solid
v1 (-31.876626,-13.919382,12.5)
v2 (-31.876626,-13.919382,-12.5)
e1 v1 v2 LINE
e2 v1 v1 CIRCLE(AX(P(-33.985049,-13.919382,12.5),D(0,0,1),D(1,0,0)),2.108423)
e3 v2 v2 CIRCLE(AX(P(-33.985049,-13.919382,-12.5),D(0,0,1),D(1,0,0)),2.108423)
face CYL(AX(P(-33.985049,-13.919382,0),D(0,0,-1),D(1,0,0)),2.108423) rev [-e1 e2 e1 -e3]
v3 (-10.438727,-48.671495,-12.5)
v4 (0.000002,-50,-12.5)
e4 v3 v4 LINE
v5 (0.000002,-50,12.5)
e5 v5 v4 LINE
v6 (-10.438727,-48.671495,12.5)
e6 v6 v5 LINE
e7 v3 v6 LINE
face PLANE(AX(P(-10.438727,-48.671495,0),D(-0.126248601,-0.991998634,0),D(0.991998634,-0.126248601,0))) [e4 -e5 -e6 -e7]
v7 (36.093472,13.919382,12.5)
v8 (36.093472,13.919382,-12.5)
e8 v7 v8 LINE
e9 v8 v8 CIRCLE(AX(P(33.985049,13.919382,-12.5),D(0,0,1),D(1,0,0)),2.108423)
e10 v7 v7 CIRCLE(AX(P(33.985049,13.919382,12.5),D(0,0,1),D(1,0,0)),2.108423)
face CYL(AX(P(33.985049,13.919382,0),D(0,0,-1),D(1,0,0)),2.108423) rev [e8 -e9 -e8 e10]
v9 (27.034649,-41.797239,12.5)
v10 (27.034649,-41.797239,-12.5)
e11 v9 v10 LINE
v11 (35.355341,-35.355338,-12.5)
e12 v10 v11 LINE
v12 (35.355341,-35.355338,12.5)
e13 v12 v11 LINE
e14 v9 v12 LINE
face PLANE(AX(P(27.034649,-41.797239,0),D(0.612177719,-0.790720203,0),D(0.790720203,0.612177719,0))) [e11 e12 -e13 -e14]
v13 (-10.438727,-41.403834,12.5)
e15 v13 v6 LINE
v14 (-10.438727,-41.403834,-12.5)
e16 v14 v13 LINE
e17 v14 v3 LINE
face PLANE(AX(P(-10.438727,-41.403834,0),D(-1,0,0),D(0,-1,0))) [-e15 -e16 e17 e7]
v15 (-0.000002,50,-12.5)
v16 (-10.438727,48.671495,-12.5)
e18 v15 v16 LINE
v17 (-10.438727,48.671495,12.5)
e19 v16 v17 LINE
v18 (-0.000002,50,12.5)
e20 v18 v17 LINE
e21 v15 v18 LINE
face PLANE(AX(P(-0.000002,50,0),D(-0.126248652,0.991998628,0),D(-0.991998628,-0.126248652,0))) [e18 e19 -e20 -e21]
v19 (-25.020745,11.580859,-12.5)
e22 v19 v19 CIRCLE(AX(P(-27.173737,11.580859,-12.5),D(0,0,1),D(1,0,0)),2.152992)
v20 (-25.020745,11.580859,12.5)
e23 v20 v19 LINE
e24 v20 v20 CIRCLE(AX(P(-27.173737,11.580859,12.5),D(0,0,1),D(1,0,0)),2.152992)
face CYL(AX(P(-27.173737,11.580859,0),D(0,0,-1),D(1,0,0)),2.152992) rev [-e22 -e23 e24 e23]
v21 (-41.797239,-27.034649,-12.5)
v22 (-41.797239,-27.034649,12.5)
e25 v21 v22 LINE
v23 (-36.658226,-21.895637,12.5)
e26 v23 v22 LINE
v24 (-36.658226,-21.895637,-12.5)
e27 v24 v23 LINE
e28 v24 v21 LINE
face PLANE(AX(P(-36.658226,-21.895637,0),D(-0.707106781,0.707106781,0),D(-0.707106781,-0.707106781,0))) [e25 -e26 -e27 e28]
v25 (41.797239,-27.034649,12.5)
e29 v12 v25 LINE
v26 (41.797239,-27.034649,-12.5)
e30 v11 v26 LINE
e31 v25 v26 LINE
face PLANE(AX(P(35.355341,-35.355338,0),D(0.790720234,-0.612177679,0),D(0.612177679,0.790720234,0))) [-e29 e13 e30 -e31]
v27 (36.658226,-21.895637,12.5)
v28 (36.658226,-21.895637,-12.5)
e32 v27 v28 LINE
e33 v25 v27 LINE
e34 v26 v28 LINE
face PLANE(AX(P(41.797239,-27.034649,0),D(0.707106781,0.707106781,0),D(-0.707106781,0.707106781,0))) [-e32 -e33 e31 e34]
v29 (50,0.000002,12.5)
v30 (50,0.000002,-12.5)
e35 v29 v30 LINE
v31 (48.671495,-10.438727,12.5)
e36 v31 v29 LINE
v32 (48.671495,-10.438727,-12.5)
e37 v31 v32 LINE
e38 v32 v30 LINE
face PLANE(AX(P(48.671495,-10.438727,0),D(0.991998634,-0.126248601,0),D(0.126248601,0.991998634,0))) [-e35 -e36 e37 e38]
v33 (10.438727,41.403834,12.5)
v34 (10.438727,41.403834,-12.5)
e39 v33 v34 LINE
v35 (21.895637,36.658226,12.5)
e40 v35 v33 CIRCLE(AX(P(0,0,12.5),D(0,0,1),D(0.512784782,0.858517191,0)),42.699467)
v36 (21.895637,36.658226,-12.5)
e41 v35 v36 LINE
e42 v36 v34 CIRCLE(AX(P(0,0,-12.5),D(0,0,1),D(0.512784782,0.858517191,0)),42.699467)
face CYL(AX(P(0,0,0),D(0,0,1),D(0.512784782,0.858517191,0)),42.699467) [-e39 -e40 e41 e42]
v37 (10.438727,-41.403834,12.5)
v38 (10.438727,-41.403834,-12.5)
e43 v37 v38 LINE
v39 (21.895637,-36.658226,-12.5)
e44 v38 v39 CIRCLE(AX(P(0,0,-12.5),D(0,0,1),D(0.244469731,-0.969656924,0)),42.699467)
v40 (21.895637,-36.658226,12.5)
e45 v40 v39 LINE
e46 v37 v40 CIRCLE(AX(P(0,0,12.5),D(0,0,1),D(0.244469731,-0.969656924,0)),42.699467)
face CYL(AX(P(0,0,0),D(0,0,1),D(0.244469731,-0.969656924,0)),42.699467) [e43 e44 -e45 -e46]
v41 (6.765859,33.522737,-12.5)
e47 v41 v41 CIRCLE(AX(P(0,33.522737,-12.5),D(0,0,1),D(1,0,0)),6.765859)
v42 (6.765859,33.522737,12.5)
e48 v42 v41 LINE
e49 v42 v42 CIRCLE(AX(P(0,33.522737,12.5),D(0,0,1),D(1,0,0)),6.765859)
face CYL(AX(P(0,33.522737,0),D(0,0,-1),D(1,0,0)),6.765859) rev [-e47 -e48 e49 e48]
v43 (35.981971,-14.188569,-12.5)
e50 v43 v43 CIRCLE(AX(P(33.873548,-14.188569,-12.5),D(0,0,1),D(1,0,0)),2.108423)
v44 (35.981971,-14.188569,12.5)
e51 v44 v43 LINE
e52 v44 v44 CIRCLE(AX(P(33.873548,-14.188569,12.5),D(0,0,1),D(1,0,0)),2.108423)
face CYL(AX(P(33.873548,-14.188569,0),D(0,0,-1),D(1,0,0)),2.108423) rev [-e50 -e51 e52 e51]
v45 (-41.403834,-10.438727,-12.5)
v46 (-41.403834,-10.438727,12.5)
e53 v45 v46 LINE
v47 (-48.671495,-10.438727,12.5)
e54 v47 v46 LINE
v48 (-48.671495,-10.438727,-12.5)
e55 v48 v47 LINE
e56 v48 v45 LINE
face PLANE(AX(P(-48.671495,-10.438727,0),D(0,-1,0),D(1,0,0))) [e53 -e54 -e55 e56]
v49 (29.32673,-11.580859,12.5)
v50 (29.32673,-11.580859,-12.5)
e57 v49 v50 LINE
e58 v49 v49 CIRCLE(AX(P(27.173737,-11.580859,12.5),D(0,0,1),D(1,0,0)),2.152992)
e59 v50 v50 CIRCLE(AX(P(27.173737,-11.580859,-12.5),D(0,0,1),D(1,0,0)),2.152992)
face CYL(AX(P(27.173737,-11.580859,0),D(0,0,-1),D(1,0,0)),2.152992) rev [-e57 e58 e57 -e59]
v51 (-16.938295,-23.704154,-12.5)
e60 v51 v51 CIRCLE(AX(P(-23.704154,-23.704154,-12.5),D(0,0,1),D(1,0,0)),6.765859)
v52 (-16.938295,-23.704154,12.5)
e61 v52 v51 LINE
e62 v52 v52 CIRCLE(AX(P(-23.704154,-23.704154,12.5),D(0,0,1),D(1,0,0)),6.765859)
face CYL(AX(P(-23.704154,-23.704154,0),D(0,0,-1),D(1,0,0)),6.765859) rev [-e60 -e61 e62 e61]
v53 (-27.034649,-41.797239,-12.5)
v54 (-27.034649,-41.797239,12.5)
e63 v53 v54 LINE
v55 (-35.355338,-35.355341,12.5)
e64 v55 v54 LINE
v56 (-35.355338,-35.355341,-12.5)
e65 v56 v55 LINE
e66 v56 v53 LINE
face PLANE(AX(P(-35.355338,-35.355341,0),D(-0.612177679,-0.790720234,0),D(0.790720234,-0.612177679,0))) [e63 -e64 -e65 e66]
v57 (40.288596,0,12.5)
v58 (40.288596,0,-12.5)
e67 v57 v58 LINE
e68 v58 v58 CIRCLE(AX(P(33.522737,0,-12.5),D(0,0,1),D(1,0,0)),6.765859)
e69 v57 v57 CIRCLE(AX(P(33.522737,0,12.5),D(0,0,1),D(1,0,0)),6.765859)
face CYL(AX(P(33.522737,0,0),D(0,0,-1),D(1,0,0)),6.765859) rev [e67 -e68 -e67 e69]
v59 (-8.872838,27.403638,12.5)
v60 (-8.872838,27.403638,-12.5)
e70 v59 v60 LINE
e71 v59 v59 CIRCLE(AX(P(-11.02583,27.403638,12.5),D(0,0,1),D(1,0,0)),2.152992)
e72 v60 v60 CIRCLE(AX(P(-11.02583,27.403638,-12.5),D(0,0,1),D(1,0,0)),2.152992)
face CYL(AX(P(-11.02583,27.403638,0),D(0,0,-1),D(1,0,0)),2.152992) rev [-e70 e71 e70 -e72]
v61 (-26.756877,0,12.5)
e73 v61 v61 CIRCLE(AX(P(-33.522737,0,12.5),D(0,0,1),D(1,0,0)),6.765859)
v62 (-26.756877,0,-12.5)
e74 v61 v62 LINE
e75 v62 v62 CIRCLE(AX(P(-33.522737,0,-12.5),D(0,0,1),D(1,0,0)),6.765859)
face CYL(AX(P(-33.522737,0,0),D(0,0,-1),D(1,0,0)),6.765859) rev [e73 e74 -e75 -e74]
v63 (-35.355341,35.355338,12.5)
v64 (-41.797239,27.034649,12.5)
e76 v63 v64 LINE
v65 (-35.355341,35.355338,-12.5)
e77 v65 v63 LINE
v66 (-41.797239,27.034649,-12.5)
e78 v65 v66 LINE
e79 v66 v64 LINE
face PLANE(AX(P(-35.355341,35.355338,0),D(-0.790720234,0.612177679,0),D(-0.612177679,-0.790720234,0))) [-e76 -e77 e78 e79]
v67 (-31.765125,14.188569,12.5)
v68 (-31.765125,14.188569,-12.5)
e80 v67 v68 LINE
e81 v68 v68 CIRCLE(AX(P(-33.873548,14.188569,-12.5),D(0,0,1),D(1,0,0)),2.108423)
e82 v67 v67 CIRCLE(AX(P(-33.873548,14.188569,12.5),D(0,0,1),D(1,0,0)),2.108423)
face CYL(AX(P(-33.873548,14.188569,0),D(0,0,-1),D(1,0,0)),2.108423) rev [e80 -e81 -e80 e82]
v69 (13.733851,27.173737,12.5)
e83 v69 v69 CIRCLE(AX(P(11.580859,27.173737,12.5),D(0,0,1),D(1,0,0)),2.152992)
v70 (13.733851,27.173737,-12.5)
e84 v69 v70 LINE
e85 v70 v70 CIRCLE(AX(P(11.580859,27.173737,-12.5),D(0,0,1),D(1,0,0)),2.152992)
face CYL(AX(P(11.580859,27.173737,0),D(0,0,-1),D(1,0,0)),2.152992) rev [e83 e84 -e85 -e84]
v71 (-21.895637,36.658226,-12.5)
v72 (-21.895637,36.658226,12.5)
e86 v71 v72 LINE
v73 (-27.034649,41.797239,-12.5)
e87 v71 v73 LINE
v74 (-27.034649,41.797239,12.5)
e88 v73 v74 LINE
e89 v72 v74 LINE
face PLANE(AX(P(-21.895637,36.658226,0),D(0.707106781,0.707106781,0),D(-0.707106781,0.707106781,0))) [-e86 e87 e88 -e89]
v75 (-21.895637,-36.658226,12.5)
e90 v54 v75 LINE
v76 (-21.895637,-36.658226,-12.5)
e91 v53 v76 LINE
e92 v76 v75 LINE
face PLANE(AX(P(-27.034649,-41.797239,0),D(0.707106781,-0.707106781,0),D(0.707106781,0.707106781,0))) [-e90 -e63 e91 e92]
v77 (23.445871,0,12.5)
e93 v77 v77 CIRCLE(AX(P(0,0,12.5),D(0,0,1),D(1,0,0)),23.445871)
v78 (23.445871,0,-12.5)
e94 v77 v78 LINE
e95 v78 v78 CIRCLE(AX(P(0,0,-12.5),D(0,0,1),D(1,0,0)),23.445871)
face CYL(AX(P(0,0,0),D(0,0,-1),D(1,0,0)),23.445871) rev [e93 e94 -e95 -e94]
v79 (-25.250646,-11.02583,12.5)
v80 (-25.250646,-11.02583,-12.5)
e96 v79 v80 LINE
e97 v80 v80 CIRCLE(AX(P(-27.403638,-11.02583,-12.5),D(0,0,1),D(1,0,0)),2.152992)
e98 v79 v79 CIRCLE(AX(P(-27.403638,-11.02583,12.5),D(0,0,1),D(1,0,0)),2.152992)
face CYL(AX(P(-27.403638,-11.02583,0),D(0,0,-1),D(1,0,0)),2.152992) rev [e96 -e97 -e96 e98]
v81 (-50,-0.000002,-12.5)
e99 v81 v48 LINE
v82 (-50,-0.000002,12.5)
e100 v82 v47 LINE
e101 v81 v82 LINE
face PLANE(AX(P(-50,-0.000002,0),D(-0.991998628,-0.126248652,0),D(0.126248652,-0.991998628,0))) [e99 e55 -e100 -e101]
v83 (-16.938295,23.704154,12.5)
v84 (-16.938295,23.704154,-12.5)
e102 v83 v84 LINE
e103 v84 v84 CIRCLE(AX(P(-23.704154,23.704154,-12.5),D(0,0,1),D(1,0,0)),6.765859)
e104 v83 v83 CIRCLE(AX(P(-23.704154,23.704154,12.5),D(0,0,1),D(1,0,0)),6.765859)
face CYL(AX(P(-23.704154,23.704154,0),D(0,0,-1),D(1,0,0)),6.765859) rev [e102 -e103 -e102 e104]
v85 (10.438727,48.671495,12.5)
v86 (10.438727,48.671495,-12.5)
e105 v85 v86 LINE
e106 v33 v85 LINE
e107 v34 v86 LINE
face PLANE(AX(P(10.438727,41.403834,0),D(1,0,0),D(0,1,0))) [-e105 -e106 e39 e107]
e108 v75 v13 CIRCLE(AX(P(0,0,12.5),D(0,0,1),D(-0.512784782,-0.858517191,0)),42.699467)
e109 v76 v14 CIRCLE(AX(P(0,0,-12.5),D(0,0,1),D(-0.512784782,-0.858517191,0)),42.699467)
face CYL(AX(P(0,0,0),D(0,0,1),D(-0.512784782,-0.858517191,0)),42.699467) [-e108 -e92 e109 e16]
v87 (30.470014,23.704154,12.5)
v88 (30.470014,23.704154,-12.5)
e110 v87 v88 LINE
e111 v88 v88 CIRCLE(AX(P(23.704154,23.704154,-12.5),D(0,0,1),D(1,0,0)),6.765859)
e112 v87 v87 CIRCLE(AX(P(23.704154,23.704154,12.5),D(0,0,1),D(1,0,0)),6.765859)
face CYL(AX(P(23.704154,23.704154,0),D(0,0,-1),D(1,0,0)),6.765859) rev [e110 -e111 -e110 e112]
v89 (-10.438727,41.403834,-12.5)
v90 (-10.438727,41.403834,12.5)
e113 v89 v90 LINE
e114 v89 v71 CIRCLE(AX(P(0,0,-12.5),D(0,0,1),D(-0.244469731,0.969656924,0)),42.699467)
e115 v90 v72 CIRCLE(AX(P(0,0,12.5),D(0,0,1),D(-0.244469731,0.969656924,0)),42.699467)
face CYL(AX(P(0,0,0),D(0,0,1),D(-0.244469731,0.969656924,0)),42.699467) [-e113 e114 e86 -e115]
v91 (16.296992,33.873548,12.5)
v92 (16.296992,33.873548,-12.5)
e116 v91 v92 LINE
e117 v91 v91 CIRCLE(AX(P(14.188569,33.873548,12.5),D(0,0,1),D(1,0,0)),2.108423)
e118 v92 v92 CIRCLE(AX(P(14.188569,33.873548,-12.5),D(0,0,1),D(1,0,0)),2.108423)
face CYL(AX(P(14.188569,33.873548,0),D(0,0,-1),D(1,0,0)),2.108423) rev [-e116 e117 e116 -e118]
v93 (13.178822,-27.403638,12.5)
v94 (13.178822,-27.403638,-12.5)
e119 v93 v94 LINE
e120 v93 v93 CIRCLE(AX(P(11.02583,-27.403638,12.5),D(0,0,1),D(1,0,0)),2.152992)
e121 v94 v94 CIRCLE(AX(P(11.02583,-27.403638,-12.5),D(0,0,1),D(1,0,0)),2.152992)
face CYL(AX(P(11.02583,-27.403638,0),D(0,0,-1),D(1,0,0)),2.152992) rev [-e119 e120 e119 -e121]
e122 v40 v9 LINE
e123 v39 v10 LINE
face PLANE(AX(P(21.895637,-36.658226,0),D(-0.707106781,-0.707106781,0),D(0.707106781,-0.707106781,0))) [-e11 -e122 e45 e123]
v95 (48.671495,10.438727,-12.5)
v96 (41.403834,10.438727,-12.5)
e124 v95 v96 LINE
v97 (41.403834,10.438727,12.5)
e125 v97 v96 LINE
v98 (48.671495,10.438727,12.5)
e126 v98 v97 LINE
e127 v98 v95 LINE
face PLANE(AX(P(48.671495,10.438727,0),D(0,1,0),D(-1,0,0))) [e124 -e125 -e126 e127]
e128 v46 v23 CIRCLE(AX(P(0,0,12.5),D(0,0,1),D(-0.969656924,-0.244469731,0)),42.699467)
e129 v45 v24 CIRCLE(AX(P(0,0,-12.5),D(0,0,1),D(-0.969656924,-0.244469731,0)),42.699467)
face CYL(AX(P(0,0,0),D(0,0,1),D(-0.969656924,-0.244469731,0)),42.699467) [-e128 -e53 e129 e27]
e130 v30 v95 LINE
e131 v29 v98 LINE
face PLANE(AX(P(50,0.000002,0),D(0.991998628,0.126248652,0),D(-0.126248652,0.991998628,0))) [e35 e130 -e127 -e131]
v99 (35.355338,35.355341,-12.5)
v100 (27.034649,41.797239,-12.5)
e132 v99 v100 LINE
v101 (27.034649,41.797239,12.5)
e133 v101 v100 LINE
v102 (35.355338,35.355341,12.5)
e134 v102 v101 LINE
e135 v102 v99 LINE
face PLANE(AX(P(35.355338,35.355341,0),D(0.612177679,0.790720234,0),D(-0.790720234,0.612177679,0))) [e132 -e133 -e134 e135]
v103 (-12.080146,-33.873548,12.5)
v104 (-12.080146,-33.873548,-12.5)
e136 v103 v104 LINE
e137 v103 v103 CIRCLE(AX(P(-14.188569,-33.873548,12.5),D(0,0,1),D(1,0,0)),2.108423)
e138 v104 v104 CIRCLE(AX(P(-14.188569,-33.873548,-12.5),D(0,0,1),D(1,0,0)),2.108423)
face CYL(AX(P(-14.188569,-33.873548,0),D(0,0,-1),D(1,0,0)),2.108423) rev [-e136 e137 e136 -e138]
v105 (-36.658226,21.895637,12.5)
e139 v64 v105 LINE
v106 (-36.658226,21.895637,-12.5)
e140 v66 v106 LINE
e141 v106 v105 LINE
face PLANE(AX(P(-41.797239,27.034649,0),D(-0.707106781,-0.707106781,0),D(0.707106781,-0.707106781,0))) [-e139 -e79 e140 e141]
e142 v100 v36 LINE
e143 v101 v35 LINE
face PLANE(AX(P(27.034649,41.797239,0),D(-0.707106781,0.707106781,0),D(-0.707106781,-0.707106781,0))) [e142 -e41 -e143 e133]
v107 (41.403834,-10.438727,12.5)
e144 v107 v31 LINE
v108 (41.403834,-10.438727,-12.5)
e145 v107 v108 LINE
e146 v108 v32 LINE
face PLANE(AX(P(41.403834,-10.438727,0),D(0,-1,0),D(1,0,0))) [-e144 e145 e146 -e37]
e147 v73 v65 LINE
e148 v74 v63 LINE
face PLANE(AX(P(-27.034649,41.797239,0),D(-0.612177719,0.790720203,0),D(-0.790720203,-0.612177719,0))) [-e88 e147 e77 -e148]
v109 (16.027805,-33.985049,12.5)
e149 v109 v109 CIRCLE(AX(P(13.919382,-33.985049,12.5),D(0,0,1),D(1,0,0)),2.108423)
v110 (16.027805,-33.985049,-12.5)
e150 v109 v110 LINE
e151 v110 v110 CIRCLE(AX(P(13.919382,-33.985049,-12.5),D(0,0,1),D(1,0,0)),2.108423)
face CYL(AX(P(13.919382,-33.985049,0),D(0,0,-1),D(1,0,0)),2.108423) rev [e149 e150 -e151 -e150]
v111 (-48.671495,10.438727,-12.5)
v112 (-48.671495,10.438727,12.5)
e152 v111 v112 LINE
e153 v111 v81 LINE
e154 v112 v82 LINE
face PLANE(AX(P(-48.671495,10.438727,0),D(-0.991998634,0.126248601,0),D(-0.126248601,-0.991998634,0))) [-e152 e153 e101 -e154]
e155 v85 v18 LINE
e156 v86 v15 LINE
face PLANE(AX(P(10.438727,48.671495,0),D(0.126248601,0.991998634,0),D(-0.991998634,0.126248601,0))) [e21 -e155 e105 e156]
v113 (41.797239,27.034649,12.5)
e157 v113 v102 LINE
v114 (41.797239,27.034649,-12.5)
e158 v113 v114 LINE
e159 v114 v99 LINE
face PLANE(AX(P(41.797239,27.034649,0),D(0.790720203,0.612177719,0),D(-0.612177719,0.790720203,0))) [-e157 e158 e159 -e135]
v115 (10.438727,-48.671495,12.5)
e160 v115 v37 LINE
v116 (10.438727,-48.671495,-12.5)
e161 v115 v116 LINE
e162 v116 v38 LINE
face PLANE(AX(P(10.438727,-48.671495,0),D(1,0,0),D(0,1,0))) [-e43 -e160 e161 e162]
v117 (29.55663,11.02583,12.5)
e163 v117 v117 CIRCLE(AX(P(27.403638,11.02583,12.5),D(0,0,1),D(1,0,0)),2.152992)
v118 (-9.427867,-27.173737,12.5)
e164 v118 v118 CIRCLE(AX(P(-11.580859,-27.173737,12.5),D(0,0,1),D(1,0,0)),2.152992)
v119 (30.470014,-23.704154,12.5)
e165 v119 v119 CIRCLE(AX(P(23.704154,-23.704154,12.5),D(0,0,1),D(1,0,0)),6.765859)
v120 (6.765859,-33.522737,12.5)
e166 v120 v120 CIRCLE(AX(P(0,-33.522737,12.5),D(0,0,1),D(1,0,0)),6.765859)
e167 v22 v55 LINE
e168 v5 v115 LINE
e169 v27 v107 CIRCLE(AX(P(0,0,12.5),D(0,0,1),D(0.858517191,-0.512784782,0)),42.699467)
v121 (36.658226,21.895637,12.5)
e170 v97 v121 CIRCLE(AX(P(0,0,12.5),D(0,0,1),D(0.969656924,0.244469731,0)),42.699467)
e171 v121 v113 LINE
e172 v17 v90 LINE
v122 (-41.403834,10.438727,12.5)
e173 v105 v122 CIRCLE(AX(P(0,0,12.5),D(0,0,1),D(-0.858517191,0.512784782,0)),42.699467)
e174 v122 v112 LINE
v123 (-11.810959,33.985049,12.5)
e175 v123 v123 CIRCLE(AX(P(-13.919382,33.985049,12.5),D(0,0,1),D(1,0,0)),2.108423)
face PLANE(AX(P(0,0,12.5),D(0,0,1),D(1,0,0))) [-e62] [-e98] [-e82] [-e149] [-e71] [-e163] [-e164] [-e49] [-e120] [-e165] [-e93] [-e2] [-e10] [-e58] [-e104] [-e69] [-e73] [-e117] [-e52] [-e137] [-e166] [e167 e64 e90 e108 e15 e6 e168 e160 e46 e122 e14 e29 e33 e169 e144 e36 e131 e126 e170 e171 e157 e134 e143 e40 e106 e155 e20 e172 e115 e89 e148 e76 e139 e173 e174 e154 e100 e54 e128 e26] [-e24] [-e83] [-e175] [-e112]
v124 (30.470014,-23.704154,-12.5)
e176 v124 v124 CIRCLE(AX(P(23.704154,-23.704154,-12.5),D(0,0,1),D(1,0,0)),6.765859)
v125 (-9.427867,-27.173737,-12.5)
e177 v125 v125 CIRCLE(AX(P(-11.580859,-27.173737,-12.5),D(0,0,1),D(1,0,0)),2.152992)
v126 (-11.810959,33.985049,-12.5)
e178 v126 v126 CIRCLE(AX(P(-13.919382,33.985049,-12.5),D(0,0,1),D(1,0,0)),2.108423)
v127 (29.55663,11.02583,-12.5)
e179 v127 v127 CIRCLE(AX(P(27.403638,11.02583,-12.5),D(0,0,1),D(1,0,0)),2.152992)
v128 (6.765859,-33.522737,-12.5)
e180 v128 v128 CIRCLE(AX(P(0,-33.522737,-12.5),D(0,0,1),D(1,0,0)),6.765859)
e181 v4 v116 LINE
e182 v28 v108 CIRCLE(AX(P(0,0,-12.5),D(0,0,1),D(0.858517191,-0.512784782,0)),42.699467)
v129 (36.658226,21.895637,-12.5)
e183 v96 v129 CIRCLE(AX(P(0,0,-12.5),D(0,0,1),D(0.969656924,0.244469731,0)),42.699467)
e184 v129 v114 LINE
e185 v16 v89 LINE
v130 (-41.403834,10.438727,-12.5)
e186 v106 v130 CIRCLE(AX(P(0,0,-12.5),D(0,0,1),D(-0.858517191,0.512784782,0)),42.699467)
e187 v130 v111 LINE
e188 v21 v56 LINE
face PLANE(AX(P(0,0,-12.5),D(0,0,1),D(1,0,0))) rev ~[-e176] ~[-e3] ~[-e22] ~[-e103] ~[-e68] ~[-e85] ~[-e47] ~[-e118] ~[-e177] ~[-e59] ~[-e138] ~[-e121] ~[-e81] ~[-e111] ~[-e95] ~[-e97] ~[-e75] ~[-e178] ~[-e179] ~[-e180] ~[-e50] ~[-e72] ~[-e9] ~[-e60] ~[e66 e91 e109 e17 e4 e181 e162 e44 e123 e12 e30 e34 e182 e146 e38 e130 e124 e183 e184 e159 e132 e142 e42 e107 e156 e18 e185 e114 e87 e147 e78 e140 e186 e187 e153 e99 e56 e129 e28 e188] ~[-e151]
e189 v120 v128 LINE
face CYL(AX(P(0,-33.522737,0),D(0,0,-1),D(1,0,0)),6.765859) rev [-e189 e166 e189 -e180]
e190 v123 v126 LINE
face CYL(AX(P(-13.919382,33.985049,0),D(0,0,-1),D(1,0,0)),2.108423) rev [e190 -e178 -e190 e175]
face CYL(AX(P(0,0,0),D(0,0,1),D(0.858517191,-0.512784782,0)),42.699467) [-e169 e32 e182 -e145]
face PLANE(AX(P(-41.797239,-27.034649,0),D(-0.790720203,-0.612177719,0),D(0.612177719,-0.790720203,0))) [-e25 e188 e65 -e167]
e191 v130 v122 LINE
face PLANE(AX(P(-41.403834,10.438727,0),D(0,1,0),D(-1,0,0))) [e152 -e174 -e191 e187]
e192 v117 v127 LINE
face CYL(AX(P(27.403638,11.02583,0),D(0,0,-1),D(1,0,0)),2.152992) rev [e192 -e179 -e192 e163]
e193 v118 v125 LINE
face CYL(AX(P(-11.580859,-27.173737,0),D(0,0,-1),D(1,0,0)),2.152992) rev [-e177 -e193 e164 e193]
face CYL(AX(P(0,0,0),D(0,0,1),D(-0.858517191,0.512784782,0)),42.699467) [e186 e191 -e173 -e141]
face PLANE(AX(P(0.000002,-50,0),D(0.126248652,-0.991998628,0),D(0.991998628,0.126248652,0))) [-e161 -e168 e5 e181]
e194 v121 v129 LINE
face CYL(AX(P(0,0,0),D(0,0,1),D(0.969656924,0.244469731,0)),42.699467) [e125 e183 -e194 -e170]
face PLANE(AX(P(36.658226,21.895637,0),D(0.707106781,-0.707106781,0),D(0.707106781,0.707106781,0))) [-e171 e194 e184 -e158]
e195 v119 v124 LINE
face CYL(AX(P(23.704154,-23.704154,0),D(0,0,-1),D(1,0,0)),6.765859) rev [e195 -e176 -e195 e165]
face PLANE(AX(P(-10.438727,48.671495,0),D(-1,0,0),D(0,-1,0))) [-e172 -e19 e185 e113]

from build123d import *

# Parameters (mm, degrees)
F1_R     = 2.1084229829
F1_R_2   = 2.1529922124
F1_R_3   = 6.765859494
F1_R_4   = 23.4458713357
F2_DEPTH = 12.5


# Not quite as in the source:
# - ends of sketch curves that miss each other by under 0.0002 mm in the source are joined


with BuildPart() as f2:
    # F1 (on Top) → F2 (new body, symmetric)
    with BuildSketch(Plane.XY):
        with BuildLine():
            Line((10.4387272149, 48.6714951694), (-2.1118e-06, 50))
            Line((-2.1118e-06, 50), (-10.4387272149, 48.6714951694))
            Line((-10.4387272149, 48.6714951694), (-10.4387272149, 41.4038337767))
            ThreePointArc((-10.4387272149, 41.4038337767), (-16.3403785702, 39.4491635584), (-21.89563683, 36.6582264313))
            Line((-21.89563683, 36.6582264313), (-27.0346494841, 41.7972390854))
            Line((-27.0346494841, 41.7972390854), (-35.3553405526, 35.355337566))
            Line((-35.3553405526, 35.355337566), (-41.7972390854, 27.0346494841))
            Line((-41.7972390854, 27.0346494841), (-36.6582264313, 21.89563683))
            ThreePointArc((-36.6582264313, 21.89563683), (-39.4491635584, 16.3403785702), (-41.4038337767, 10.4387272149))
            Line((-41.4038337767, 10.4387272149), (-48.6714951694, 10.4387272149))
            Line((-48.6714951694, 10.4387272149), (-50, -2.1118e-06))
            Line((-50, -2.1118e-06), (-48.6714951694, -10.4387272149))
            Line((-48.6714951694, -10.4387272149), (-41.4038337767, -10.4387272149))
            ThreePointArc((-41.4038337767, -10.4387272149), (-39.4491635584, -16.3403785702), (-36.6582264313, -21.89563683))
            Line((-36.6582264313, -21.89563683), (-41.7972390854, -27.0346494841))
            Line((-41.7972390854, -27.0346494841), (-35.355337566, -35.3553405526))
            Line((-35.355337566, -35.3553405526), (-27.0346494841, -41.7972390854))
            Line((-27.0346494841, -41.7972390854), (-21.89563683, -36.6582264313))
            ThreePointArc((-21.89563683, -36.6582264313), (-16.3403785702, -39.4491635584), (-10.4387272149, -41.4038337767))
            Line((-10.4387272149, -41.4038337767), (-10.4387272149, -48.6714951694))
            Line((-10.4387272149, -48.6714951694), (2.1118e-06, -50))
            Line((2.1118e-06, -50), (10.4387272149, -48.6714951694))
            Line((10.4387272149, -48.6714951694), (10.4387272149, -41.4038337767))
            ThreePointArc((10.4387272149, -41.4038337767), (16.3403785702, -39.4491635584), (21.89563683, -36.6582264313))
            Line((21.89563683, -36.6582264313), (27.0346494841, -41.7972390854))
            Line((27.0346494841, -41.7972390854), (35.3553405526, -35.355337566))
            Line((35.3553405526, -35.355337566), (41.7972390854, -27.0346494841))
            Line((41.7972390854, -27.0346494841), (36.6582264313, -21.89563683))
            ThreePointArc((36.6582264313, -21.89563683), (39.4491635584, -16.3403785702), (41.4038337767, -10.4387272149))
            Line((41.4038337767, -10.4387272149), (48.6714951694, -10.4387272149))
            Line((48.6714951694, -10.4387272149), (50, 2.1118e-06))
            Line((50, 2.1118e-06), (48.6714951694, 10.4387272149))
            Line((48.6714951694, 10.4387272149), (41.4038337767, 10.4387272149))
            ThreePointArc((41.4038337767, 10.4387272149), (39.4491635584, 16.3403785702), (36.6582264313, 21.89563683))
            Line((36.6582264313, 21.89563683), (41.7972390854, 27.0346494841))
            Line((41.7972390854, 27.0346494841), (35.355337566, 35.3553405526))
            Line((35.355337566, 35.3553405526), (27.0346494841, 41.7972390854))
            Line((27.0346494841, 41.7972390854), (21.89563683, 36.6582264313))
            ThreePointArc((21.89563683, 36.6582264313), (16.3403785702, 39.4491635584), (10.4387272149, 41.4038337767))
            Line((10.4387272149, 41.4038337767), (10.4387272149, 48.6714951694))
        make_face()
        with Locations((-14.1885686223, -33.8735479302)):
            Circle(F1_R, mode=Mode.SUBTRACT)
        with Locations((-11.5808588113, -27.1737373769)):
            Circle(F1_R_2, mode=Mode.SUBTRACT)
        with Locations((-33.9850485325, -13.9193823561)):
            Circle(F1_R, mode=Mode.SUBTRACT)
        with Locations((-27.4036377668, -11.025830172)):
            Circle(F1_R_2, mode=Mode.SUBTRACT)
        with Locations((-23.7041544531, -23.7041544531)):
            Circle(F1_R_3, mode=Mode.SUBTRACT)
        with Locations((0, -33.5227367122)):
            Circle(F1_R_3, mode=Mode.SUBTRACT)
        with Locations((11.025830172, -27.4036377668)):
            Circle(F1_R_2, mode=Mode.SUBTRACT)
        with Locations((13.9193823561, -33.9850485325)):
            Circle(F1_R, mode=Mode.SUBTRACT)
        with Locations((23.7041544531, -23.7041544531)):
            Circle(F1_R_3, mode=Mode.SUBTRACT)
        with Locations((33.8735479302, -14.1885686223)):
            Circle(F1_R, mode=Mode.SUBTRACT)
        with Locations((27.1737373769, -11.5808588113)):
            Circle(F1_R_2, mode=Mode.SUBTRACT)
        with Locations((-33.5227367122, 0)):
            Circle(F1_R_3, mode=Mode.SUBTRACT)
        with Locations((-27.1737373769, 11.5808588113)):
            Circle(F1_R_2, mode=Mode.SUBTRACT)
        with Locations((-33.8735479302, 14.1885686223)):
            Circle(F1_R, mode=Mode.SUBTRACT)
        with Locations((-23.7041544531, 23.7041544531)):
            Circle(F1_R_3, mode=Mode.SUBTRACT)
        with Locations((-13.9193823561, 33.9850485325)):
            Circle(F1_R, mode=Mode.SUBTRACT)
        with Locations((-11.025830172, 27.4036377668)):
            Circle(F1_R_2, mode=Mode.SUBTRACT)
        Circle(F1_R_4, mode=Mode.SUBTRACT)
        with Locations((23.7041544531, 23.7041544531)):
            Circle(F1_R_3, mode=Mode.SUBTRACT)
        with Locations((33.5227367122, 0)):
            Circle(F1_R_3, mode=Mode.SUBTRACT)
        with Locations((27.4036377668, 11.025830172)):
            Circle(F1_R_2, mode=Mode.SUBTRACT)
        with Locations((33.9850485325, 13.9193823561)):
            Circle(F1_R, mode=Mode.SUBTRACT)
        with Locations((11.5808588113, 27.1737373769)):
            Circle(F1_R_2, mode=Mode.SUBTRACT)
        with Locations((0, 33.5227367122)):
            Circle(F1_R_3, mode=Mode.SUBTRACT)
        with Locations((14.1885686223, 33.8735479302)):
            Circle(F1_R, mode=Mode.SUBTRACT)
    extrude(amount=F2_DEPTH, both=True)


solid = f2.part
